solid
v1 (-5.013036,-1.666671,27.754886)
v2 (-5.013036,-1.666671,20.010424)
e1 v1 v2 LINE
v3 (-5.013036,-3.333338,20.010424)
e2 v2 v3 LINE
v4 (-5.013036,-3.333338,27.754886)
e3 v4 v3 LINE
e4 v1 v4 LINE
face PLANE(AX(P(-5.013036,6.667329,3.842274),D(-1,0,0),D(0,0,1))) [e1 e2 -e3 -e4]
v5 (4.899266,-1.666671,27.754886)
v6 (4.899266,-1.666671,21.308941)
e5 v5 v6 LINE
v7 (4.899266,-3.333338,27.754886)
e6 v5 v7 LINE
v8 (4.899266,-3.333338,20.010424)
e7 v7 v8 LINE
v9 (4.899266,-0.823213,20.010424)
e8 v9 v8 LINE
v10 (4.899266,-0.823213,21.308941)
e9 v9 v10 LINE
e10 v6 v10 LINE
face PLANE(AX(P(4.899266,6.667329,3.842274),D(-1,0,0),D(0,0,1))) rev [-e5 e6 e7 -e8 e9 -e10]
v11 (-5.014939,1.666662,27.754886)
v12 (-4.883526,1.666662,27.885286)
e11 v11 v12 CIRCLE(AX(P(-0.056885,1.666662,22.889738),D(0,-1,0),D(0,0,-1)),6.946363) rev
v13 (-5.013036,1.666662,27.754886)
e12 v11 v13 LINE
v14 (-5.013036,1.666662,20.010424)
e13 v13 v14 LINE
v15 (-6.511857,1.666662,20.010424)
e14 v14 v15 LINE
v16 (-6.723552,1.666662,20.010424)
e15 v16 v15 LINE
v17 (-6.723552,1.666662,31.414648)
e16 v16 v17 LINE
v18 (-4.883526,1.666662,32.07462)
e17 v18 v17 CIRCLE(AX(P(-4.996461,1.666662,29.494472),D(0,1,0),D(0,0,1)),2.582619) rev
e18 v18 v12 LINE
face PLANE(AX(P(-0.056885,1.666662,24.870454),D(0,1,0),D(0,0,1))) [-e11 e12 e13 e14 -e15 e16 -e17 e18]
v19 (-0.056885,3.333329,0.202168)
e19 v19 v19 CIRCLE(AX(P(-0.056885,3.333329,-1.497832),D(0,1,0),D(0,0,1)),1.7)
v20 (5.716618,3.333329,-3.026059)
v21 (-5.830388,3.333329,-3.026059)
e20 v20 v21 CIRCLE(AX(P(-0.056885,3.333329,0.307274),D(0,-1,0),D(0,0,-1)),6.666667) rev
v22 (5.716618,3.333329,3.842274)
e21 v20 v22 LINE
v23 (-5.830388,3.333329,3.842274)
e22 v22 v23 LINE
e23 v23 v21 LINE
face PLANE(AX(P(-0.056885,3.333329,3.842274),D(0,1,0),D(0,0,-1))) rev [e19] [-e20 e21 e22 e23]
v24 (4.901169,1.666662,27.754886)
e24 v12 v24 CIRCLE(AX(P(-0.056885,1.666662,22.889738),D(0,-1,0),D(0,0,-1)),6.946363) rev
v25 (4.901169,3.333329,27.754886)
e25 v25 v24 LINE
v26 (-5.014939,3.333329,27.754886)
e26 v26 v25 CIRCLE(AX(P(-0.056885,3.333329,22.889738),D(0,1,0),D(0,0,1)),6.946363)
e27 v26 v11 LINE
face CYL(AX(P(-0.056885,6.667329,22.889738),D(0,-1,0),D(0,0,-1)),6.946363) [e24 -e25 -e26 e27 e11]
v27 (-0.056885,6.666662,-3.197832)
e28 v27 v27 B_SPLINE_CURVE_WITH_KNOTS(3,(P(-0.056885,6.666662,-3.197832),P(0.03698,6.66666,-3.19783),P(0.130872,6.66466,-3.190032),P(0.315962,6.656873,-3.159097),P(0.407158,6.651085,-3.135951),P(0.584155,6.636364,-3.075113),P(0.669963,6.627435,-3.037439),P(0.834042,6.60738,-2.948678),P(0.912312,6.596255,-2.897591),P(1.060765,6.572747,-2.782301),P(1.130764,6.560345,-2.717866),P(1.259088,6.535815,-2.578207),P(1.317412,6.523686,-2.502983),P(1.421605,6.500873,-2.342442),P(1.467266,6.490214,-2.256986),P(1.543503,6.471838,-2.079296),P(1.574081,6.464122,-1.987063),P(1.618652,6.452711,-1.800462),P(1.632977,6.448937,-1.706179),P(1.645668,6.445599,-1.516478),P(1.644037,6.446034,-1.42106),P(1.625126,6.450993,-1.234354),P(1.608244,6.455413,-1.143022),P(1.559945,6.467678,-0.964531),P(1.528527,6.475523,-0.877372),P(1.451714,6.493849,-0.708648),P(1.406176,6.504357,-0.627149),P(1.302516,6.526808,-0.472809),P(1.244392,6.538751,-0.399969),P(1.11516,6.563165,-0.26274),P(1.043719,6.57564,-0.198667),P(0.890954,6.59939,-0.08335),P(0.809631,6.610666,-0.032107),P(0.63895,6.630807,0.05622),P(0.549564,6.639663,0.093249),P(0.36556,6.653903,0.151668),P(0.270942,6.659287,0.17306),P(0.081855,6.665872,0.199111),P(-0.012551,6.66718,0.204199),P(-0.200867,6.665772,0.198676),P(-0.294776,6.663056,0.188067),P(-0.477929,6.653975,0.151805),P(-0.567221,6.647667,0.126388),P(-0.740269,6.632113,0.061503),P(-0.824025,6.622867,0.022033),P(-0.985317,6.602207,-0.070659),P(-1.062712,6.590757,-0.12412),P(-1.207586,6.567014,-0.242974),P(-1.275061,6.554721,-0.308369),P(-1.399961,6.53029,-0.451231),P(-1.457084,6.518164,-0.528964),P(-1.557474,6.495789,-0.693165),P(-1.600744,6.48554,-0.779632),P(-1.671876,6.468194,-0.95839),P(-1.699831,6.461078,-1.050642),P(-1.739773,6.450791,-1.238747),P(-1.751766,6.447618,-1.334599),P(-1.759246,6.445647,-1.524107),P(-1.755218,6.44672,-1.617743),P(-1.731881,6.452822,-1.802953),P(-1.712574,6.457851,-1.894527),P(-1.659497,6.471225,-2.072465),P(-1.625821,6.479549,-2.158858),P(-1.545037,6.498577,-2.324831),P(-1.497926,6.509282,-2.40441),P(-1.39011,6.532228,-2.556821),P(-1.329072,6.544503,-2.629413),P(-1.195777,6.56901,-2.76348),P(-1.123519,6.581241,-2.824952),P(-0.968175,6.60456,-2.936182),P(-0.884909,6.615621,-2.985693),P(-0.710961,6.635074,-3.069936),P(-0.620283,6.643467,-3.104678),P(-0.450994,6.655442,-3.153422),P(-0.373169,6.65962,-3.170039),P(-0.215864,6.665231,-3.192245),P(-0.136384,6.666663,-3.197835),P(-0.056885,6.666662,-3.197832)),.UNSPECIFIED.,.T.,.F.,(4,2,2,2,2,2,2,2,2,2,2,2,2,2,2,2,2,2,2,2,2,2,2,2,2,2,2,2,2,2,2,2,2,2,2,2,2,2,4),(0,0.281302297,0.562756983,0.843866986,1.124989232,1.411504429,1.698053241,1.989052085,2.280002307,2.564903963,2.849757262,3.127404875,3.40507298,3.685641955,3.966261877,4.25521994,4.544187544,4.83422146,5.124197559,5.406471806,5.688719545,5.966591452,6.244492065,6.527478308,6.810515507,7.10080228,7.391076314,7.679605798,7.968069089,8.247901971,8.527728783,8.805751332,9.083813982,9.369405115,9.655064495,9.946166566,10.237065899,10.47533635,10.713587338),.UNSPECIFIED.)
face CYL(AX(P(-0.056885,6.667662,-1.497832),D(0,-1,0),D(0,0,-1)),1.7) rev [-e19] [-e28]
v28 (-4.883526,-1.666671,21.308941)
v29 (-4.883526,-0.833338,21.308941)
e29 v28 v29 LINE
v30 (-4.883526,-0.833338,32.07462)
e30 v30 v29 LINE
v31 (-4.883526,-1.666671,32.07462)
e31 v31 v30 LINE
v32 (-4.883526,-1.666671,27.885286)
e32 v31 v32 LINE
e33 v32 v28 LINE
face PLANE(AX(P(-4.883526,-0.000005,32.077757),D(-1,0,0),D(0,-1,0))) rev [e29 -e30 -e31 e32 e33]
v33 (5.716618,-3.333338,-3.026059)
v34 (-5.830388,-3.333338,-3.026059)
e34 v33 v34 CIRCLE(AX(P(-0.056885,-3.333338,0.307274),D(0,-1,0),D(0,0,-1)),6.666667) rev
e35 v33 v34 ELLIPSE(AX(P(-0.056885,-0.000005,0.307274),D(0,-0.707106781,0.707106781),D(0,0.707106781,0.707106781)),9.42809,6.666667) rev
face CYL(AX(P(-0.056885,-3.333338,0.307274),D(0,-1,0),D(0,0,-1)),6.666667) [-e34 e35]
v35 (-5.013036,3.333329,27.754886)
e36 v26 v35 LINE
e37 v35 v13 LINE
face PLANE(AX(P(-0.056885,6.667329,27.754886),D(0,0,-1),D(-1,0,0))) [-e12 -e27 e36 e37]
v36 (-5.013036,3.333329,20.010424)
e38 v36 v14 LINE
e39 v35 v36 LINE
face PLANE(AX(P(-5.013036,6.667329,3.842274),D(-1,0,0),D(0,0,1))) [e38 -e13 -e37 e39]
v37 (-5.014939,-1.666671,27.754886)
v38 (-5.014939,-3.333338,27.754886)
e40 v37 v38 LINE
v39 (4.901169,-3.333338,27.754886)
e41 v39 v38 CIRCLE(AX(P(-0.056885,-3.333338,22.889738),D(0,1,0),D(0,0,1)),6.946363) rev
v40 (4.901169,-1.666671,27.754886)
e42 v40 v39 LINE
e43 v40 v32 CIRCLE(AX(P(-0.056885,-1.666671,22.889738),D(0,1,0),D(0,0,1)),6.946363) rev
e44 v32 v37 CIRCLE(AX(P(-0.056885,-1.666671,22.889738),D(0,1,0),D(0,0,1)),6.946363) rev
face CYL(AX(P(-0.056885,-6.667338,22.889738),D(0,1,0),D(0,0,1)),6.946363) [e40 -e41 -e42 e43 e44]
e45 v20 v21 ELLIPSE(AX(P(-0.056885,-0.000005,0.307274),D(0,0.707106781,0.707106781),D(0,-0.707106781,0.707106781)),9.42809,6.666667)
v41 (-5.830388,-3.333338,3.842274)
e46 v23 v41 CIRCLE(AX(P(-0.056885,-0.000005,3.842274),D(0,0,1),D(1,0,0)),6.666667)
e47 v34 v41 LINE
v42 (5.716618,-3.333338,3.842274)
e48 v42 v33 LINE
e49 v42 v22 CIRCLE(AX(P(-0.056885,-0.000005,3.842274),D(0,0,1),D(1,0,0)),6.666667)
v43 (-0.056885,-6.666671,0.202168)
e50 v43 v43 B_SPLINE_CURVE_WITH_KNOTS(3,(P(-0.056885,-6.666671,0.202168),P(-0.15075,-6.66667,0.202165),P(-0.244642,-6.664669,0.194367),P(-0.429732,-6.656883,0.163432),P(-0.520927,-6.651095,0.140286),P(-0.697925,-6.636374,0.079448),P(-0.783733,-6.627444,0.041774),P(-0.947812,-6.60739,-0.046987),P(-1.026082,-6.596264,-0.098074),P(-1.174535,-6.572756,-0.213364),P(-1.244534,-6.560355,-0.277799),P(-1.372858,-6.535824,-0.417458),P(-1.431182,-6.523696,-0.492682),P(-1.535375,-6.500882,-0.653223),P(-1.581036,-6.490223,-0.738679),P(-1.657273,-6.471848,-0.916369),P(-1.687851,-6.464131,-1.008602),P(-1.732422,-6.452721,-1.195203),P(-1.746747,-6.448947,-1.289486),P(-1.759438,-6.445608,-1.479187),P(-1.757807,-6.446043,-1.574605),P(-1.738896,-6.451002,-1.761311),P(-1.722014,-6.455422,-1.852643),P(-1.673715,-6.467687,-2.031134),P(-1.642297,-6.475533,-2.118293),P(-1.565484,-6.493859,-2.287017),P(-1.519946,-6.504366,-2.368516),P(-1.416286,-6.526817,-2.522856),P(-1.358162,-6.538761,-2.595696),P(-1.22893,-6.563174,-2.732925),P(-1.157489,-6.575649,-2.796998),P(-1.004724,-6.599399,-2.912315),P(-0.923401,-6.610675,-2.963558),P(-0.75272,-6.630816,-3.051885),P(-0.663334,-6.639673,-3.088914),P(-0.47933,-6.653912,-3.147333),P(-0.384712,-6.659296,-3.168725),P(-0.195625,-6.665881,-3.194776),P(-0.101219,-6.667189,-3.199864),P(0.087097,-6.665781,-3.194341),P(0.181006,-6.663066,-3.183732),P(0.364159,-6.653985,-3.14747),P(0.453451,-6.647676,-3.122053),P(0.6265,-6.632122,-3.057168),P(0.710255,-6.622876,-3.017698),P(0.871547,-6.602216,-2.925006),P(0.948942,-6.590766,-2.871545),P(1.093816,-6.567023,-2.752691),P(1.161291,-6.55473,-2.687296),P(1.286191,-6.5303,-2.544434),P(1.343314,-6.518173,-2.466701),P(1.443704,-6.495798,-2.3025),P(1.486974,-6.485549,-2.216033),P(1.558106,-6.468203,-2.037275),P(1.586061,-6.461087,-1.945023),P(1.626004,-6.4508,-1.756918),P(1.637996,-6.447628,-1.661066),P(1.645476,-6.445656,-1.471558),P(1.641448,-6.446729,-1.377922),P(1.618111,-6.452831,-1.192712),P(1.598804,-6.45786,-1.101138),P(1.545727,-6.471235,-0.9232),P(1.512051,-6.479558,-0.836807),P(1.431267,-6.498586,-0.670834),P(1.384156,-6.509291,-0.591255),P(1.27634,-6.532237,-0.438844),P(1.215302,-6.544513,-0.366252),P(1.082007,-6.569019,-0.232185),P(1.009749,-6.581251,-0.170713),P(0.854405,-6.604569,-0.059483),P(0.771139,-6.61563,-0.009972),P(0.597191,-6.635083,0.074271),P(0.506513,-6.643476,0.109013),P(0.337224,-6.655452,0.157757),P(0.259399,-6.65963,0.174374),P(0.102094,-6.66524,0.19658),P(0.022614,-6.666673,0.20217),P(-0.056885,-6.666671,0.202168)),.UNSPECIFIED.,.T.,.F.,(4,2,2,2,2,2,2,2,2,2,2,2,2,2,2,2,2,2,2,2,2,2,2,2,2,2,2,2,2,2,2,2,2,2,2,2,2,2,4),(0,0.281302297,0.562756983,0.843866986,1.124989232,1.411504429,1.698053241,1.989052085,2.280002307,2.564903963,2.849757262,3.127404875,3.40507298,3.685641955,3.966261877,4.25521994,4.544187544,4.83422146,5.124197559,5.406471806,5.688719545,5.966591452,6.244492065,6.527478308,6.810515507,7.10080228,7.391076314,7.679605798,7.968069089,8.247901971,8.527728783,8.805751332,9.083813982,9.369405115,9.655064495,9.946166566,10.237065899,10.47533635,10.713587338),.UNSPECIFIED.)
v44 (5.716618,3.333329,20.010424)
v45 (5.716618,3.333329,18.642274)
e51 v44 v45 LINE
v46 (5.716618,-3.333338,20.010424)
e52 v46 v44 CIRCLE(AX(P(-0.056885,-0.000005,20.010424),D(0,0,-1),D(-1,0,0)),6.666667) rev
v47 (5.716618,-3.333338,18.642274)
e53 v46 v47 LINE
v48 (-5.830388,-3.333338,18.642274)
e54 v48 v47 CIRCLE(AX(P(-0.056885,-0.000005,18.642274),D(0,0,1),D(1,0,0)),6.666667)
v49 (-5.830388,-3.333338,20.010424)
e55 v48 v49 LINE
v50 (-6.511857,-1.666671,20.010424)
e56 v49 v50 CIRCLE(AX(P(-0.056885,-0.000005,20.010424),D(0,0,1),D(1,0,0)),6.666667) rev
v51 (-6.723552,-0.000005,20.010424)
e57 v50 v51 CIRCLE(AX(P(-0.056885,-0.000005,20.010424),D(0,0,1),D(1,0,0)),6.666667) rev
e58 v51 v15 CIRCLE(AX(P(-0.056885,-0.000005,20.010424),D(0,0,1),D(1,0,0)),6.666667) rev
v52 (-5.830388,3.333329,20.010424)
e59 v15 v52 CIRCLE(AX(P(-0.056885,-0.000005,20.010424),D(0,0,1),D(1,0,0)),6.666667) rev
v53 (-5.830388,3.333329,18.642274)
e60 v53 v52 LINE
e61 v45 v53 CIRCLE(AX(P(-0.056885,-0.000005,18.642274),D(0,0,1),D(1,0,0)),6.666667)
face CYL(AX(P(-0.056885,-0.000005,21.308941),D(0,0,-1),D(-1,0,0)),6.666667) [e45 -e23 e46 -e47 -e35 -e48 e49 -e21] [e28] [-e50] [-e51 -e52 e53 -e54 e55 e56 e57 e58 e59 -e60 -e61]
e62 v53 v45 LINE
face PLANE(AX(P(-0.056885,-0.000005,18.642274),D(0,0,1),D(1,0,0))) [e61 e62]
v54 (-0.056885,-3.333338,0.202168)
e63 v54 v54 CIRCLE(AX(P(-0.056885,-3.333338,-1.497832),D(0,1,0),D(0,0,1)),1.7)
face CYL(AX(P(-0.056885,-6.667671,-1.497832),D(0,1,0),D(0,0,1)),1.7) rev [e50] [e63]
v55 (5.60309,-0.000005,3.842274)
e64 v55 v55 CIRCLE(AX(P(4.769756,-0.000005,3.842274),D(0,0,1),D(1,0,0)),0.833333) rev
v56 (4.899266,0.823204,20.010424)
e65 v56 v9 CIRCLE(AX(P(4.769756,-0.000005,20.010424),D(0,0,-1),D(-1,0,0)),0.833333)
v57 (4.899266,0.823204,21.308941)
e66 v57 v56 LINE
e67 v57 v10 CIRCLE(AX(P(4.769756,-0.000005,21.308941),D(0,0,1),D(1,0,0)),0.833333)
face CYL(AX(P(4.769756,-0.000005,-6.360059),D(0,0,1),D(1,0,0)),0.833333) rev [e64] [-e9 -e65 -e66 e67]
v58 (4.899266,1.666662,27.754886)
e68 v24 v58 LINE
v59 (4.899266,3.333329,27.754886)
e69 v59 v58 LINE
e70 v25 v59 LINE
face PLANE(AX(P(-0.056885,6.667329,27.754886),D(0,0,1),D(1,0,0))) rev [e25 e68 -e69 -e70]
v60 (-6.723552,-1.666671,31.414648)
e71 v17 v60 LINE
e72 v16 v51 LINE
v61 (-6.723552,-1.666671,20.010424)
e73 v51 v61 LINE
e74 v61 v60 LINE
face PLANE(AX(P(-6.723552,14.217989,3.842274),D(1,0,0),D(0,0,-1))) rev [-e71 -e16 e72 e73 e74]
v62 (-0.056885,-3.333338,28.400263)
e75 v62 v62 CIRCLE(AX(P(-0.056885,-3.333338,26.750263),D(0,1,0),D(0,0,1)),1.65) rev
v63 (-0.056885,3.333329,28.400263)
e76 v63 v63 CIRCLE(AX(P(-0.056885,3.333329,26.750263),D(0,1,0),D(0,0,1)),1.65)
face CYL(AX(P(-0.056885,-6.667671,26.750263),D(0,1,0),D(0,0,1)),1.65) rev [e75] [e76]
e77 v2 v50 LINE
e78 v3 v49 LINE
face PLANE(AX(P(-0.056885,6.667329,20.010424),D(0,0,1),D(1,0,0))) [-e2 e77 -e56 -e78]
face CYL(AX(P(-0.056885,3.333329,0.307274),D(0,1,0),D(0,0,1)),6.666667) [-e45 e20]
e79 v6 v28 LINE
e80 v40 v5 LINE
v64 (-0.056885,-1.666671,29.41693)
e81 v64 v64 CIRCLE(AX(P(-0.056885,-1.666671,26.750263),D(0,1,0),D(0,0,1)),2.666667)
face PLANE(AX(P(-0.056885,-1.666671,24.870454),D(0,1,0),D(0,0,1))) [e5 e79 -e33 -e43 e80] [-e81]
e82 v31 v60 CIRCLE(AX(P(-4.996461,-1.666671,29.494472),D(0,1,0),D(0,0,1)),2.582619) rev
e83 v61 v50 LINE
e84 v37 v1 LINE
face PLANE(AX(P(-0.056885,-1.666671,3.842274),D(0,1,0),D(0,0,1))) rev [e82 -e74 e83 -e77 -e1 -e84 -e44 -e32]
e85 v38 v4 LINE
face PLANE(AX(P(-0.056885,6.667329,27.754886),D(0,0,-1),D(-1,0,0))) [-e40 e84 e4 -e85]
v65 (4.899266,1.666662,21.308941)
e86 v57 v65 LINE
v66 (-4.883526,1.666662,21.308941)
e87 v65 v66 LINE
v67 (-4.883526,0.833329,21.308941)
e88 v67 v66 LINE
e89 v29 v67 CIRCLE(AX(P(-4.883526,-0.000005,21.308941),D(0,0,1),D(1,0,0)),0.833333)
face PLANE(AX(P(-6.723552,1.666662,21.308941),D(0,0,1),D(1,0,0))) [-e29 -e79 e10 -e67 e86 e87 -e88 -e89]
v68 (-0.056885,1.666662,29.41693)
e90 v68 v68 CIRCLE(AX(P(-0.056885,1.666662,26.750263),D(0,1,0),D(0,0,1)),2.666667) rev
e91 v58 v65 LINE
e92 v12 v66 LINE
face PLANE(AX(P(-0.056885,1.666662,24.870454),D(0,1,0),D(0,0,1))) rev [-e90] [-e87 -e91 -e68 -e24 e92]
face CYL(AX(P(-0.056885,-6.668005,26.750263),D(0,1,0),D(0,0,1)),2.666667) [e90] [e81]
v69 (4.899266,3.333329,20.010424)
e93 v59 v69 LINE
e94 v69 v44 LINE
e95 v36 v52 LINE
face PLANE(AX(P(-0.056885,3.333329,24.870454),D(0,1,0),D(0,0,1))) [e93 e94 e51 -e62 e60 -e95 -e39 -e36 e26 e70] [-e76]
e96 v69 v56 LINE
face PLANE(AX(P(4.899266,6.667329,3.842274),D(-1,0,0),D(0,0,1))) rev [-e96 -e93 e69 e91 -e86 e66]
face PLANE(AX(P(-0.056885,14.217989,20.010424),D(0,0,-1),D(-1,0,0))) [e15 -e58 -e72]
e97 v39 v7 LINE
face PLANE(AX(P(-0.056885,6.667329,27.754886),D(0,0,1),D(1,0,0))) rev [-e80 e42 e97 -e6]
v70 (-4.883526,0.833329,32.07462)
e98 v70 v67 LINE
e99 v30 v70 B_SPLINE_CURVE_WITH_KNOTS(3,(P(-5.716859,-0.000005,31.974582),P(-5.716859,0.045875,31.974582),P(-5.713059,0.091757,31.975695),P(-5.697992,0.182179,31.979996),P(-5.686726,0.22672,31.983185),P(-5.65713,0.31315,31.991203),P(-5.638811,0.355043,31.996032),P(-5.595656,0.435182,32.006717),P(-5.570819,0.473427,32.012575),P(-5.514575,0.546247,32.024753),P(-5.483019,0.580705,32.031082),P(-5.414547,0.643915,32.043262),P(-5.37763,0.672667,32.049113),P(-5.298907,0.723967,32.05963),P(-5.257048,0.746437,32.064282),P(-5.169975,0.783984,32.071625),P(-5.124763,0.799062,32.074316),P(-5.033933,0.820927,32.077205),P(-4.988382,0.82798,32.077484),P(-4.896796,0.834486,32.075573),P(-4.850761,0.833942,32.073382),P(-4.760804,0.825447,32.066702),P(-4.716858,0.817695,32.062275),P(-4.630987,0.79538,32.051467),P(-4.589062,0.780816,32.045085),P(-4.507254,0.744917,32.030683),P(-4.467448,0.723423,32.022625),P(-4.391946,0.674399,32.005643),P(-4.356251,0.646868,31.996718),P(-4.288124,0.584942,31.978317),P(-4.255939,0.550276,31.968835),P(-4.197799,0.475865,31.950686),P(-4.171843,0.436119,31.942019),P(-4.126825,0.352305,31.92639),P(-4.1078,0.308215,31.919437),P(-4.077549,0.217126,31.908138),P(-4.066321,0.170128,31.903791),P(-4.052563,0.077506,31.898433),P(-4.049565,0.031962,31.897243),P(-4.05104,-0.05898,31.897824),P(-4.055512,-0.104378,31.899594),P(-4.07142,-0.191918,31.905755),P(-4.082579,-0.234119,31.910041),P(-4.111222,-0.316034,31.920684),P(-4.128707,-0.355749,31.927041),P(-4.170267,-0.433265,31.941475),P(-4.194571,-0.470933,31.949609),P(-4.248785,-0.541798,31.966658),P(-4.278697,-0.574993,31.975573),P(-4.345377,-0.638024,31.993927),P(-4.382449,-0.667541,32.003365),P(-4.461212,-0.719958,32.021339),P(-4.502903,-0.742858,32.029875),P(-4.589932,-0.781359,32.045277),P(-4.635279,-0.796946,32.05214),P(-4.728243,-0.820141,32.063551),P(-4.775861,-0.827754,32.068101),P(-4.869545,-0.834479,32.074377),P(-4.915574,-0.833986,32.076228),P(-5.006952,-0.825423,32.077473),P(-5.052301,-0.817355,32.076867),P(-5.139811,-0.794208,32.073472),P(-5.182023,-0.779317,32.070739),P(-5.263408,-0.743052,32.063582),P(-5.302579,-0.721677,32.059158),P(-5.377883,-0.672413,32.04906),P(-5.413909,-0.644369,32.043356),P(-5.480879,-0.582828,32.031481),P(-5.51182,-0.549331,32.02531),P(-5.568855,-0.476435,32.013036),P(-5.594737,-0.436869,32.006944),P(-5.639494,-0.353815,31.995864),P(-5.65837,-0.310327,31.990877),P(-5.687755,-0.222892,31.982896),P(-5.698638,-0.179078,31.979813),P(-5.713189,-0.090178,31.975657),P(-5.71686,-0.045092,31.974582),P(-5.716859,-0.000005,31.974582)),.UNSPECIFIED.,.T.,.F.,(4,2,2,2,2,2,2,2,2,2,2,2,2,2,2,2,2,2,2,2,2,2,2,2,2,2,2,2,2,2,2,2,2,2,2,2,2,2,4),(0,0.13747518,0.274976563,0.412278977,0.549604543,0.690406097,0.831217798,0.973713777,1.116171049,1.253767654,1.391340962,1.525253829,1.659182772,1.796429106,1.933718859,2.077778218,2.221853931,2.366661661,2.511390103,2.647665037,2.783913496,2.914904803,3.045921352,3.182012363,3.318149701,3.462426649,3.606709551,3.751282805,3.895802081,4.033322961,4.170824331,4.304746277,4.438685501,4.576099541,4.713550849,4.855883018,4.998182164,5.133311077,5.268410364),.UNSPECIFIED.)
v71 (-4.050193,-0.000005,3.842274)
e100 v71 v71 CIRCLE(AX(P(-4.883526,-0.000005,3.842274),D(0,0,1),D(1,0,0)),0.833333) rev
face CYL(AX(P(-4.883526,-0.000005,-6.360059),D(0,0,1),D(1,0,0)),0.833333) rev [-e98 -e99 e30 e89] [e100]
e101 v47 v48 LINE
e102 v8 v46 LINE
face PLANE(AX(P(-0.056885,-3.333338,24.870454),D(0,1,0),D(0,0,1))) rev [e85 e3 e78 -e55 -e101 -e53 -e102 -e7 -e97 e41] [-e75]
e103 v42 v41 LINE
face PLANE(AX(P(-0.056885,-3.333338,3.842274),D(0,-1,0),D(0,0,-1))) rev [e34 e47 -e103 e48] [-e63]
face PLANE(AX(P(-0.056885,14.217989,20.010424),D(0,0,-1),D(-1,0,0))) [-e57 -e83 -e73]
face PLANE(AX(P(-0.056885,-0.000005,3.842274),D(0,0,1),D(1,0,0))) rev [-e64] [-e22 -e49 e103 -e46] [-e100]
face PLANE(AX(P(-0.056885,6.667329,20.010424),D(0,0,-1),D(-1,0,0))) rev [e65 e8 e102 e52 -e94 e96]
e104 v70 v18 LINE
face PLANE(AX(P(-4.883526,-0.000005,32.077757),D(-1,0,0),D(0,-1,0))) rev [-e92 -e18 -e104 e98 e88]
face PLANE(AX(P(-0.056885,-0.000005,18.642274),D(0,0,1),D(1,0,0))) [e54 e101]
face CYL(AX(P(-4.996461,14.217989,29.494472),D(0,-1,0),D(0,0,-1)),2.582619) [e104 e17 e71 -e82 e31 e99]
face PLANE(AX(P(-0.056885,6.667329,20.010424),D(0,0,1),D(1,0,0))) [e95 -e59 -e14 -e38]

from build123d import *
from build123d.topology import SkipClean

# Parameters (mm, degrees)
SKETCH2_R                       = 10
PHALANGE_LENGTH_DEPTH           = 26.2
BOSS_EXTRUDE3_DEPTH             = 5
BOSS_EXTRUDE4_DEPTH             = 5
BOSS_EXTRUDE4_DEPTH_BACK        = 5
CUT_EXTRUDE2_START              = -15.3025
CUT_EXTRUDE2_DEPTH              = 15.3025
SKETCH7_R                       = 1.65
CUT_EXTRUDE3_DEPTH              = 10
CUT_EXTRUDE4_DEPTH              = 2.5
CUT_EXTRUDE4_DEPTH_BACK         = 2.5
CUT_EXTRUDE7_REACH              = 47.294
SKETCH4_R                       = 1.65
CUT_EXTRUDE7_DIRECTION_2_REACH  = 47.294
CUT_EXTRUDE_THIN1_START         = 26.2
CUT_EXTRUDE_THIN1_DEPTH         = 10.361670454
BOSS_EXTRUDE5_REACH             = 46.529
SKETCH9_R                       = 4
SKETCH9_R_2                     = 1.65
CUT_EXTRUDE8_REACH              = 45.846
SKETCH10_R                      = 1.25
CUT_EXTRUDE9_START              = -4
CUT_EXTRUDE9_DEPTH              = 4
CUT_EXTRUDE10_REACH             = 46.529
CUT_EXTRUDE10_DIRECTION_2_REACH = 46.529
CUT_EXTRUDE11_START             = -10
CUT_EXTRUDE11_OUTLINE_W         = 2.565773848
CUT_EXTRUDE11_OUTLINE_H         = 11.6166929
CUT_EXTRUDE11_DEPTH             = 10
BOSS_EXTRUDE7_REACH             = 44.149
CUT_EXTRUDE12_REACH             = 45.846
SKETCH10_2_R                    = 1.25
CUT_EXTRUDE12_DIRECTION_2_REACH = 45.846
SKETCH17_R                      = 1.25
SKETCH17_W                      = 2.42123439
SKETCH17_H                      = 5
CUT_EXTRUDE14_DEPTH             = 16.148519
SCALE1_SCALE                    = 0.666666667
CUT_EXTRUDE15_START             = -10.000004
SKETCH18_R                      = 1.65
CUT_EXTRUDE15_DEPTH             = 13.333342
CUT_EXTRUDE16_START             = -3.333333
SKETCH19_R                      = 1.7
CUT_EXTRUDE16_DEPTH             = 13.333338


# Read off the part's stored shape, not the designer's step: Cut-Extrude-Thin1, Cut-Extrude11
with BuildPart() as part:
    # Sketch2 → Phalange Length (new body)
    with BuildSketch(Plane.XY):
        Circle(SKETCH2_R)
    extrude(amount=PHALANGE_LENGTH_DEPTH)

    # Sketch3 → Boss-Extrude3 (add)
    with BuildSketch(Plane(origin=(0, -10, 0), x_dir=(-1, 0, 0), z_dir=(0, -1, 0))):
        with BuildLine():
            Line((-10, 5.302499701), (-10, 0))
            Line((-10, 0), (10, 0))
            Line((10, 0), (10, 5.302499701))
            ThreePointArc((10, 5.302499701), (0, 15.302499701), (-10, 5.302499701))
        make_face()
    boss_extrude3 = extrude(amount=-BOSS_EXTRUDE3_DEPTH)

    # Mirror1: Boss-Extrude3 across plane
    add(boss_extrude3.mirror(Plane.ZX))

    # Sketch5 → Boss-Extrude4 (add, two sides: drawn at the far end of the back side and taken through both)
    with BuildSketch(Plane(origin=(0, 0, 0), x_dir=(1, 0, 0), z_dir=(0, 1, 0)).offset(-BOSS_EXTRUDE4_DEPTH_BACK)):
        with BuildLine():
            Line((-10, -31.983157911), (-10, -26.2))
            Line((-10, -26.2), (10, -26.2))
            Line((10, -26.2), (10, -31.983157911))
            ThreePointArc((10, -31.983157911), (0, -41.551984156), (-10, -31.983157911))
        make_face()
    extrude(amount=BOSS_EXTRUDE4_DEPTH + BOSS_EXTRUDE4_DEPTH_BACK)

    # Sketch6 → Cut-Extrude2 (cut)
    with SkipClean():  # the faces are left unmerged after this step: merging them gives an invalid solid
        with BuildSketch(Plane.XY.offset(CUT_EXTRUDE2_START)):
            with BuildLine():
                ThreePointArc((0, 10), (5, 8.660254038), (8.660254038, 5))
                Line((8.660254038, 5), (10, 5))
                Line((10, 5), (10, 10))
                Line((10, 10), (0, 10))
            make_face()
            with BuildLine():
                Line((10, -5), (8.660254038, -5))
                ThreePointArc((8.660254038, -5), (5, -8.660254038), (0, -10))
                Line((0, -10), (10, -10))
                Line((10, -10), (10, -5))
            make_face()
            with BuildLine():
                ThreePointArc((-8.660254038, 5), (-5, 8.660254038), (0, 10))
                Line((0, 10), (-10, 10))
                Line((-10, 10), (-10, 5))
                Line((-10, 5), (-8.660254038, 5))
            make_face()
            with BuildLine():
                Line((-10, -10), (0, -10))
                ThreePointArc((0, -10), (-5, -8.660254038), (-8.660254038, -5))
                Line((-8.660254038, -5), (-10, -5))
                Line((-10, -5), (-10, -10))
            make_face()
        extrude(amount=CUT_EXTRUDE2_DEPTH, mode=Mode.SUBTRACT)

    # Sketch7 → Cut-Extrude3 (cut)
    with SkipClean():  # the faces are left unmerged after this step: merging them gives an invalid solid
        with BuildSketch(Plane(origin=(0, 5, 0), x_dir=(1, 0, 0), z_dir=(0, 1, 0))):
            with Locations(Location((0, -34.361984156, 0), (0, 0, 270))):
                Circle(SKETCH7_R)
        extrude(amount=-CUT_EXTRUDE3_DEPTH, mode=Mode.SUBTRACT)

    # Sketch5<2> → Cut-Extrude4 (cut, two sides: drawn at the far end of the back side and taken through both)
    with BuildSketch(Plane(origin=(0, 0, 0), x_dir=(1, 0, 0), z_dir=(0, 1, 0)).offset(-CUT_EXTRUDE4_DEPTH_BACK)):
        with BuildLine():
            Line((-10, -31.983157911), (-10, -26.2))
            Line((-10, -26.2), (10, -26.2))
            Line((10, -26.2), (10, -31.983157911))
            ThreePointArc((10, -31.983157911), (0, -41.551984156), (-10, -31.983157911))
        make_face()
    extrude(amount=CUT_EXTRUDE4_DEPTH + CUT_EXTRUDE4_DEPTH_BACK, mode=Mode.SUBTRACT)

    # Sketch4 → Cut-Extrude7 (cut, up to next)
    with BuildSketch(Plane(origin=(0, -5, 0), x_dir=(1, 0, 0), z_dir=(0, 1, 0)), mode=Mode.PRIVATE) as cut_extrude7_sk1:
        with Locations(Location((0, 8.010159673, 0), (0, 0, 270))):
            Circle(SKETCH4_R)
    cut_extrude7_tool1 = extrude(cut_extrude7_sk1.sketch, amount=-CUT_EXTRUDE7_REACH, mode=Mode.PRIVATE) & part.part
    add(cut_extrude7_tool1.solids().sort_by_distance((0, -5, -8.01016))[0], mode=Mode.SUBTRACT)

    # Sketch4 → Cut-Extrude7 direction 2 (cut, up to next)
    with BuildSketch(Plane(origin=(0, -5, 0), x_dir=(1, 0, 0), z_dir=(0, 1, 0)), mode=Mode.PRIVATE) as cut_extrude7_direction_2_sk1:
        with Locations(Location((0, 8.010159673, 0), (0, 0, 270))):
            Circle(SKETCH4_R)
    cut_extrude7_direction_2_tool1 = extrude(cut_extrude7_direction_2_sk1.sketch, amount=CUT_EXTRUDE7_DIRECTION_2_REACH, mode=Mode.PRIVATE) & part.part
    add(cut_extrude7_direction_2_tool1.solids().sort_by_distance((0, -5, -8.01016))[0], mode=Mode.SUBTRACT)

    # Cut-Extrude-Thin1 outline → Cut-Extrude-Thin1 (cut)
    with SkipClean():  # the faces are left unmerged after this step: merging them gives an invalid solid
        with BuildSketch(Plane.XY.offset(CUT_EXTRUDE_THIN1_START)):
            with BuildLine():
                ThreePointArc((8.660254038, 5), (9.256147934, 3.78466979), (9.682458366, 2.5))
                Line((9.682458366, 2.5), (10, 2.5))
                Line((10, 2.5), (10, 5))
                Line((10, 5), (8.660254038, 5))
            make_face()
            with BuildLine():
                Line((10, -2.5), (9.682458366, -2.5))
                ThreePointArc((9.682458366, -2.5), (9.256147934, -3.78466979), (8.660254038, -5))
                Line((8.660254038, -5), (10, -5))
                Line((10, -5), (10, -2.5))
            make_face()
            with BuildLine():
                Line((-10, 2.5), (-9.682458366, 2.5))
                ThreePointArc((-9.682458366, 2.5), (-9.256147934, 3.78466979), (-8.660254038, 5))
                Line((-8.660254038, 5), (-10, 5))
                Line((-10, 5), (-10, 2.5))
            make_face()
            with BuildLine():
                ThreePointArc((-8.660254038, -5), (-9.256147934, -3.78466979), (-9.682458366, -2.5))
                Line((-9.682458366, -2.5), (-10, -2.5))
                Line((-10, -2.5), (-10, -5))
                Line((-10, -5), (-8.660254038, -5))
            make_face()
        extrude(amount=CUT_EXTRUDE_THIN1_DEPTH, mode=Mode.SUBTRACT)

    # Sketch9 → Boss-Extrude5 (add, up to next)
    with BuildSketch(Plane.XZ.offset(-2.5), mode=Mode.PRIVATE) as boss_extrude5_sk1:
        with Locations(Location((0, 34.361984156, 0), (0, 0, 90))):
            Circle(SKETCH9_R)
        with Locations(Location((0, 34.361984156, 0), (0, 0, 90))):
            Circle(SKETCH9_R_2, mode=Mode.SUBTRACT)
    boss_extrude5_tool1 = extrude(boss_extrude5_sk1.sketch, amount=BOSS_EXTRUDE5_REACH, mode=Mode.PRIVATE) - part.part
    add(boss_extrude5_tool1.solids().sort_by_distance((0, 2.5, 30.475121))[0])

    # Sketch10 → Cut-Extrude8 (cut, up to next)
    with BuildSketch(Plane.XY.offset(26.2), mode=Mode.PRIVATE) as cut_extrude8_sk1:
        with Locations((7.239961745, 0)):
            Circle(SKETCH10_R)
    cut_extrude8_tool1 = extrude(cut_extrude8_sk1.sketch, amount=-CUT_EXTRUDE8_REACH, mode=Mode.PRIVATE) & part.part
    # Sketch10 → Cut-Extrude8 (cut, up to next)
    with BuildSketch(Plane.XY.offset(26.2), mode=Mode.PRIVATE) as cut_extrude8_sk2:
        with Locations((-7.239961745, 0)):
            Circle(SKETCH10_R)
    cut_extrude8_tool2 = extrude(cut_extrude8_sk2.sketch, amount=-CUT_EXTRUDE8_REACH, mode=Mode.PRIVATE) & part.part
    add(cut_extrude8_tool1.solids().sort_by_distance((7.239962, 0, 26.2))[0], mode=Mode.SUBTRACT)
    add(cut_extrude8_tool2.solids().sort_by_distance((-7.239962, 0, 26.2))[0], mode=Mode.SUBTRACT)

    # Sketch11 → Cut-Extrude9 (cut)
    with SkipClean():  # the faces are left unmerged after this step: merging them gives an invalid solid
        with BuildSketch(Plane.XY.offset(26.2).offset(CUT_EXTRUDE9_START)):
            with BuildLine():
                ThreePointArc((8.660254038, 5), (0, 10), (-8.660254038, 5))
                Line((-8.660254038, 5), (8.660254038, 5))
            make_face()
            with BuildLine():
                Line((8.660254038, -5), (-8.660254038, -5))
                ThreePointArc((-8.660254038, -5), (0, -10), (8.660254038, -5))
            make_face()
        extrude(amount=CUT_EXTRUDE9_DEPTH, mode=Mode.SUBTRACT)

    # Sketch12 → Cut-Extrude10 (cut, up to next)
    with BuildSketch(Plane.XZ.offset(-2.5), mode=Mode.PRIVATE) as cut_extrude10_sk1:
        with BuildLine():
            Line((-10.033719202, 41.551984156), (-10.033719202, 34.364892021))
            Line((-10.033719202, 34.364892021), (-8.660254038, 34.364892021))
            ThreePointArc((-8.660254038, 34.364892021), (0, 38.990740593), (8.660254038, 34.364892021))
            Line((8.660254038, 34.364892021), (10.033719202, 34.364892021))
            Line((10.033719202, 34.364892021), (10.033719202, 41.551984156))
            Line((10.033719202, 41.551984156), (-10.033719202, 41.551984156))
        make_face()
    cut_extrude10_tool1 = extrude(cut_extrude10_sk1.sketch, amount=CUT_EXTRUDE10_REACH, mode=Mode.PRIVATE) & part.part
    add(cut_extrude10_tool1.solids().sort_by_distance((0, 2.5, 39.050279))[0], mode=Mode.SUBTRACT)

    # Sketch12 → Cut-Extrude10 direction 2 (cut, up to next)
    with BuildSketch(Plane.XZ.offset(-2.5), mode=Mode.PRIVATE) as cut_extrude10_direction_2_sk1:
        with BuildLine():
            Line((-10.033719202, 41.551984156), (-10.033719202, 34.364892021))
            Line((-10.033719202, 34.364892021), (-8.660254038, 34.364892021))
            ThreePointArc((-8.660254038, 34.364892021), (0, 38.990740593), (8.660254038, 34.364892021))
            Line((8.660254038, 34.364892021), (10.033719202, 34.364892021))
            Line((10.033719202, 34.364892021), (10.033719202, 41.551984156))
            Line((10.033719202, 41.551984156), (-10.033719202, 41.551984156))
        make_face()
    cut_extrude10_direction_2_tool1 = extrude(cut_extrude10_direction_2_sk1.sketch, amount=-CUT_EXTRUDE10_DIRECTION_2_REACH, mode=Mode.PRIVATE) & part.part
    add(cut_extrude10_direction_2_tool1.solids().sort_by_distance((0, 2.5, 39.050279))[0], mode=Mode.SUBTRACT)

    # Cut-Extrude11 outline → Cut-Extrude11 (cut)
    with BuildSketch(Plane.XZ.offset(5).offset(CUT_EXTRUDE11_START)):
        with Locations((-8.717113076, 30.060571369)):
            Rectangle(CUT_EXTRUDE11_OUTLINE_W, CUT_EXTRUDE11_OUTLINE_H)
        with Locations((8.717113076, 30.060571369)):
            Rectangle(CUT_EXTRUDE11_OUTLINE_W, CUT_EXTRUDE11_OUTLINE_H)
    extrude(amount=CUT_EXTRUDE11_DEPTH, mode=Mode.SUBTRACT)

    # Boss-Extrude7: up to this face of the body (flat: up to its plane)
    boss_extrude7_end = Plane(part.part.faces().sort_by_distance((0, 2.5, 26.396174341))[0])
    # Sketch16 → Boss-Extrude7 (add, up to the picked face)
    with BuildSketch(Plane(origin=(0, -2.5, 0), x_dir=(1, 0, 0), z_dir=(0, 1, 0)), mode=Mode.PRIVATE) as boss_extrude7_sk1:
        with BuildLine():
            Line((-4.818727355, -24.252224919), (-7.434226152, -24.252224919))
            Line((-7.434226152, -24.252224919), (-10, -24.252224919))
            Line((-10, -24.252224919), (-10, -41.358561033))
            ThreePointArc((-10, -41.358561033), (-8.808295471, -42.090817912), (-7.43422564, -42.352145139))
            ThreePointArc((-7.43422564, -42.352145139), (-6.033645007, -42.099721533), (-4.818727355, -41.358561033))
            Line((-4.818727355, -41.358561033), (-4.818727355, -37.809527951))
            ThreePointArc((-4.818727355, -37.809527951), (-6.204248493, -36.942230104), (-7.437080645, -35.868917819))
            Line((-7.437080645, -35.868917819), (-7.434226152, -35.868917819))
            Line((-7.434226152, -35.868917819), (-7.434226152, -26.2))
            Line((-7.434226152, -26.2), (-4.818727355, -26.2))
            Line((-4.818727355, -26.2), (-4.818727355, -24.252224919))
        make_face()
    boss_extrude7_tool1 = split(extrude(boss_extrude7_sk1.sketch, amount=BOSS_EXTRUDE7_REACH, mode=Mode.PRIVATE), bisect_by=boss_extrude7_end, keep=Keep.BOTH, mode=Mode.PRIVATE)
    # Sketch16 → Boss-Extrude7 (add, up to the picked face)
    with BuildSketch(Plane(origin=(0, -2.5, 0), x_dir=(1, 0, 0), z_dir=(0, 1, 0)), mode=Mode.PRIVATE) as boss_extrude7_sk2:
        with BuildLine():
            Line((-4.818727355, -37.809527951), (-4.818727355, -26.2))
            Line((-4.818727355, -26.2), (-7.434226152, -26.2))
            Line((-7.434226152, -26.2), (-7.434226152, -35.868917819))
            Line((-7.434226152, -35.868917819), (-7.437080645, -35.868917819))
            ThreePointArc((-7.437080645, -35.868917819), (-6.204248493, -36.942230104), (-4.818727355, -37.809527951))
        make_face()
    boss_extrude7_tool2 = split(extrude(boss_extrude7_sk2.sketch, amount=BOSS_EXTRUDE7_REACH, mode=Mode.PRIVATE), bisect_by=boss_extrude7_end, keep=Keep.BOTH, mode=Mode.PRIVATE)
    add(boss_extrude7_tool1.solids().sort_by(Axis((-7.989429, -2.5, 33.833344), (0, 1, 0)))[0])
    add(boss_extrude7_tool2.solids().sort_by(Axis((-6.08748, -2.5, 31.5879), (0, 1, 0)))[0])

    # Sketch10<2> → Cut-Extrude12 (cut, up to next)
    with BuildSketch(Plane.XY.offset(26.2), mode=Mode.PRIVATE) as cut_extrude12_sk1:
        with Locations((-7.239961745, 0)):
            Circle(SKETCH10_2_R)
    cut_extrude12_tool1 = extrude(cut_extrude12_sk1.sketch, amount=CUT_EXTRUDE12_REACH, mode=Mode.PRIVATE) & part.part
    add(cut_extrude12_tool1.solids().sort_by_distance((-7.239962, 0, 26.2))[0], mode=Mode.SUBTRACT)

    # Sketch10<2> → Cut-Extrude12 direction 2 (cut, up to next)
    with BuildSketch(Plane.XY.offset(26.2), mode=Mode.PRIVATE) as cut_extrude12_direction_2_sk1:
        with Locations((-7.239961745, 0)):
            Circle(SKETCH10_2_R)
    cut_extrude12_direction_2_tool1 = extrude(cut_extrude12_direction_2_sk1.sketch, amount=-CUT_EXTRUDE12_DIRECTION_2_REACH, mode=Mode.PRIVATE) & part.part
    add(cut_extrude12_direction_2_tool1.solids().sort_by_distance((-7.239962, 0, 26.2))[0], mode=Mode.SUBTRACT)

    # Sketch17 → Cut-Extrude14 (cut)
    with SkipClean():  # the faces are left unmerged after this step: merging them gives an invalid solid
        with BuildSketch(Plane.XY.offset(26.2)):
            with Locations((-7.239961745, 0)):
                Circle(SKETCH17_R)
            with Locations((-6.02934455, 0)):
                Rectangle(SKETCH17_W, SKETCH17_H)
        extrude(amount=CUT_EXTRUDE14_DEPTH, mode=Mode.SUBTRACT)


with BuildPart() as part_1:
    # Scale1: scaled about (-0.170628715, -1.58e-07, 11.526321464)
    add(part.part.scale(SCALE1_SCALE).moved(Location((-0.056876238, -5.3e-08, 3.842107155))))

    # Sketch18 → Cut-Extrude15 (cut)
    with BuildSketch(Plane(origin=(0, 3.333328658, 0), x_dir=(1, 0, 0), z_dir=(0, 1, 0)).offset(CUT_EXTRUDE15_START)):
        with Locations(Location((-0.056884983, -26.750263395, 0), (0, 0, 270))):
            Circle(SKETCH18_R)
    extrude(amount=CUT_EXTRUDE15_DEPTH, mode=Mode.SUBTRACT)

    # Sketch19 → Cut-Extrude16 (cut)
    with BuildSketch(Plane(origin=(0, -3.333338008, 0), x_dir=(1, 0, 0), z_dir=(0, 1, 0)).offset(CUT_EXTRUDE16_START)):
        with Locations(Location((-0.056884983, 1.497832491, 0), (0, 0, 90))):
            Circle(SKETCH19_R)
    extrude(amount=CUT_EXTRUDE16_DEPTH, mode=Mode.SUBTRACT)


solid = part_1.part
